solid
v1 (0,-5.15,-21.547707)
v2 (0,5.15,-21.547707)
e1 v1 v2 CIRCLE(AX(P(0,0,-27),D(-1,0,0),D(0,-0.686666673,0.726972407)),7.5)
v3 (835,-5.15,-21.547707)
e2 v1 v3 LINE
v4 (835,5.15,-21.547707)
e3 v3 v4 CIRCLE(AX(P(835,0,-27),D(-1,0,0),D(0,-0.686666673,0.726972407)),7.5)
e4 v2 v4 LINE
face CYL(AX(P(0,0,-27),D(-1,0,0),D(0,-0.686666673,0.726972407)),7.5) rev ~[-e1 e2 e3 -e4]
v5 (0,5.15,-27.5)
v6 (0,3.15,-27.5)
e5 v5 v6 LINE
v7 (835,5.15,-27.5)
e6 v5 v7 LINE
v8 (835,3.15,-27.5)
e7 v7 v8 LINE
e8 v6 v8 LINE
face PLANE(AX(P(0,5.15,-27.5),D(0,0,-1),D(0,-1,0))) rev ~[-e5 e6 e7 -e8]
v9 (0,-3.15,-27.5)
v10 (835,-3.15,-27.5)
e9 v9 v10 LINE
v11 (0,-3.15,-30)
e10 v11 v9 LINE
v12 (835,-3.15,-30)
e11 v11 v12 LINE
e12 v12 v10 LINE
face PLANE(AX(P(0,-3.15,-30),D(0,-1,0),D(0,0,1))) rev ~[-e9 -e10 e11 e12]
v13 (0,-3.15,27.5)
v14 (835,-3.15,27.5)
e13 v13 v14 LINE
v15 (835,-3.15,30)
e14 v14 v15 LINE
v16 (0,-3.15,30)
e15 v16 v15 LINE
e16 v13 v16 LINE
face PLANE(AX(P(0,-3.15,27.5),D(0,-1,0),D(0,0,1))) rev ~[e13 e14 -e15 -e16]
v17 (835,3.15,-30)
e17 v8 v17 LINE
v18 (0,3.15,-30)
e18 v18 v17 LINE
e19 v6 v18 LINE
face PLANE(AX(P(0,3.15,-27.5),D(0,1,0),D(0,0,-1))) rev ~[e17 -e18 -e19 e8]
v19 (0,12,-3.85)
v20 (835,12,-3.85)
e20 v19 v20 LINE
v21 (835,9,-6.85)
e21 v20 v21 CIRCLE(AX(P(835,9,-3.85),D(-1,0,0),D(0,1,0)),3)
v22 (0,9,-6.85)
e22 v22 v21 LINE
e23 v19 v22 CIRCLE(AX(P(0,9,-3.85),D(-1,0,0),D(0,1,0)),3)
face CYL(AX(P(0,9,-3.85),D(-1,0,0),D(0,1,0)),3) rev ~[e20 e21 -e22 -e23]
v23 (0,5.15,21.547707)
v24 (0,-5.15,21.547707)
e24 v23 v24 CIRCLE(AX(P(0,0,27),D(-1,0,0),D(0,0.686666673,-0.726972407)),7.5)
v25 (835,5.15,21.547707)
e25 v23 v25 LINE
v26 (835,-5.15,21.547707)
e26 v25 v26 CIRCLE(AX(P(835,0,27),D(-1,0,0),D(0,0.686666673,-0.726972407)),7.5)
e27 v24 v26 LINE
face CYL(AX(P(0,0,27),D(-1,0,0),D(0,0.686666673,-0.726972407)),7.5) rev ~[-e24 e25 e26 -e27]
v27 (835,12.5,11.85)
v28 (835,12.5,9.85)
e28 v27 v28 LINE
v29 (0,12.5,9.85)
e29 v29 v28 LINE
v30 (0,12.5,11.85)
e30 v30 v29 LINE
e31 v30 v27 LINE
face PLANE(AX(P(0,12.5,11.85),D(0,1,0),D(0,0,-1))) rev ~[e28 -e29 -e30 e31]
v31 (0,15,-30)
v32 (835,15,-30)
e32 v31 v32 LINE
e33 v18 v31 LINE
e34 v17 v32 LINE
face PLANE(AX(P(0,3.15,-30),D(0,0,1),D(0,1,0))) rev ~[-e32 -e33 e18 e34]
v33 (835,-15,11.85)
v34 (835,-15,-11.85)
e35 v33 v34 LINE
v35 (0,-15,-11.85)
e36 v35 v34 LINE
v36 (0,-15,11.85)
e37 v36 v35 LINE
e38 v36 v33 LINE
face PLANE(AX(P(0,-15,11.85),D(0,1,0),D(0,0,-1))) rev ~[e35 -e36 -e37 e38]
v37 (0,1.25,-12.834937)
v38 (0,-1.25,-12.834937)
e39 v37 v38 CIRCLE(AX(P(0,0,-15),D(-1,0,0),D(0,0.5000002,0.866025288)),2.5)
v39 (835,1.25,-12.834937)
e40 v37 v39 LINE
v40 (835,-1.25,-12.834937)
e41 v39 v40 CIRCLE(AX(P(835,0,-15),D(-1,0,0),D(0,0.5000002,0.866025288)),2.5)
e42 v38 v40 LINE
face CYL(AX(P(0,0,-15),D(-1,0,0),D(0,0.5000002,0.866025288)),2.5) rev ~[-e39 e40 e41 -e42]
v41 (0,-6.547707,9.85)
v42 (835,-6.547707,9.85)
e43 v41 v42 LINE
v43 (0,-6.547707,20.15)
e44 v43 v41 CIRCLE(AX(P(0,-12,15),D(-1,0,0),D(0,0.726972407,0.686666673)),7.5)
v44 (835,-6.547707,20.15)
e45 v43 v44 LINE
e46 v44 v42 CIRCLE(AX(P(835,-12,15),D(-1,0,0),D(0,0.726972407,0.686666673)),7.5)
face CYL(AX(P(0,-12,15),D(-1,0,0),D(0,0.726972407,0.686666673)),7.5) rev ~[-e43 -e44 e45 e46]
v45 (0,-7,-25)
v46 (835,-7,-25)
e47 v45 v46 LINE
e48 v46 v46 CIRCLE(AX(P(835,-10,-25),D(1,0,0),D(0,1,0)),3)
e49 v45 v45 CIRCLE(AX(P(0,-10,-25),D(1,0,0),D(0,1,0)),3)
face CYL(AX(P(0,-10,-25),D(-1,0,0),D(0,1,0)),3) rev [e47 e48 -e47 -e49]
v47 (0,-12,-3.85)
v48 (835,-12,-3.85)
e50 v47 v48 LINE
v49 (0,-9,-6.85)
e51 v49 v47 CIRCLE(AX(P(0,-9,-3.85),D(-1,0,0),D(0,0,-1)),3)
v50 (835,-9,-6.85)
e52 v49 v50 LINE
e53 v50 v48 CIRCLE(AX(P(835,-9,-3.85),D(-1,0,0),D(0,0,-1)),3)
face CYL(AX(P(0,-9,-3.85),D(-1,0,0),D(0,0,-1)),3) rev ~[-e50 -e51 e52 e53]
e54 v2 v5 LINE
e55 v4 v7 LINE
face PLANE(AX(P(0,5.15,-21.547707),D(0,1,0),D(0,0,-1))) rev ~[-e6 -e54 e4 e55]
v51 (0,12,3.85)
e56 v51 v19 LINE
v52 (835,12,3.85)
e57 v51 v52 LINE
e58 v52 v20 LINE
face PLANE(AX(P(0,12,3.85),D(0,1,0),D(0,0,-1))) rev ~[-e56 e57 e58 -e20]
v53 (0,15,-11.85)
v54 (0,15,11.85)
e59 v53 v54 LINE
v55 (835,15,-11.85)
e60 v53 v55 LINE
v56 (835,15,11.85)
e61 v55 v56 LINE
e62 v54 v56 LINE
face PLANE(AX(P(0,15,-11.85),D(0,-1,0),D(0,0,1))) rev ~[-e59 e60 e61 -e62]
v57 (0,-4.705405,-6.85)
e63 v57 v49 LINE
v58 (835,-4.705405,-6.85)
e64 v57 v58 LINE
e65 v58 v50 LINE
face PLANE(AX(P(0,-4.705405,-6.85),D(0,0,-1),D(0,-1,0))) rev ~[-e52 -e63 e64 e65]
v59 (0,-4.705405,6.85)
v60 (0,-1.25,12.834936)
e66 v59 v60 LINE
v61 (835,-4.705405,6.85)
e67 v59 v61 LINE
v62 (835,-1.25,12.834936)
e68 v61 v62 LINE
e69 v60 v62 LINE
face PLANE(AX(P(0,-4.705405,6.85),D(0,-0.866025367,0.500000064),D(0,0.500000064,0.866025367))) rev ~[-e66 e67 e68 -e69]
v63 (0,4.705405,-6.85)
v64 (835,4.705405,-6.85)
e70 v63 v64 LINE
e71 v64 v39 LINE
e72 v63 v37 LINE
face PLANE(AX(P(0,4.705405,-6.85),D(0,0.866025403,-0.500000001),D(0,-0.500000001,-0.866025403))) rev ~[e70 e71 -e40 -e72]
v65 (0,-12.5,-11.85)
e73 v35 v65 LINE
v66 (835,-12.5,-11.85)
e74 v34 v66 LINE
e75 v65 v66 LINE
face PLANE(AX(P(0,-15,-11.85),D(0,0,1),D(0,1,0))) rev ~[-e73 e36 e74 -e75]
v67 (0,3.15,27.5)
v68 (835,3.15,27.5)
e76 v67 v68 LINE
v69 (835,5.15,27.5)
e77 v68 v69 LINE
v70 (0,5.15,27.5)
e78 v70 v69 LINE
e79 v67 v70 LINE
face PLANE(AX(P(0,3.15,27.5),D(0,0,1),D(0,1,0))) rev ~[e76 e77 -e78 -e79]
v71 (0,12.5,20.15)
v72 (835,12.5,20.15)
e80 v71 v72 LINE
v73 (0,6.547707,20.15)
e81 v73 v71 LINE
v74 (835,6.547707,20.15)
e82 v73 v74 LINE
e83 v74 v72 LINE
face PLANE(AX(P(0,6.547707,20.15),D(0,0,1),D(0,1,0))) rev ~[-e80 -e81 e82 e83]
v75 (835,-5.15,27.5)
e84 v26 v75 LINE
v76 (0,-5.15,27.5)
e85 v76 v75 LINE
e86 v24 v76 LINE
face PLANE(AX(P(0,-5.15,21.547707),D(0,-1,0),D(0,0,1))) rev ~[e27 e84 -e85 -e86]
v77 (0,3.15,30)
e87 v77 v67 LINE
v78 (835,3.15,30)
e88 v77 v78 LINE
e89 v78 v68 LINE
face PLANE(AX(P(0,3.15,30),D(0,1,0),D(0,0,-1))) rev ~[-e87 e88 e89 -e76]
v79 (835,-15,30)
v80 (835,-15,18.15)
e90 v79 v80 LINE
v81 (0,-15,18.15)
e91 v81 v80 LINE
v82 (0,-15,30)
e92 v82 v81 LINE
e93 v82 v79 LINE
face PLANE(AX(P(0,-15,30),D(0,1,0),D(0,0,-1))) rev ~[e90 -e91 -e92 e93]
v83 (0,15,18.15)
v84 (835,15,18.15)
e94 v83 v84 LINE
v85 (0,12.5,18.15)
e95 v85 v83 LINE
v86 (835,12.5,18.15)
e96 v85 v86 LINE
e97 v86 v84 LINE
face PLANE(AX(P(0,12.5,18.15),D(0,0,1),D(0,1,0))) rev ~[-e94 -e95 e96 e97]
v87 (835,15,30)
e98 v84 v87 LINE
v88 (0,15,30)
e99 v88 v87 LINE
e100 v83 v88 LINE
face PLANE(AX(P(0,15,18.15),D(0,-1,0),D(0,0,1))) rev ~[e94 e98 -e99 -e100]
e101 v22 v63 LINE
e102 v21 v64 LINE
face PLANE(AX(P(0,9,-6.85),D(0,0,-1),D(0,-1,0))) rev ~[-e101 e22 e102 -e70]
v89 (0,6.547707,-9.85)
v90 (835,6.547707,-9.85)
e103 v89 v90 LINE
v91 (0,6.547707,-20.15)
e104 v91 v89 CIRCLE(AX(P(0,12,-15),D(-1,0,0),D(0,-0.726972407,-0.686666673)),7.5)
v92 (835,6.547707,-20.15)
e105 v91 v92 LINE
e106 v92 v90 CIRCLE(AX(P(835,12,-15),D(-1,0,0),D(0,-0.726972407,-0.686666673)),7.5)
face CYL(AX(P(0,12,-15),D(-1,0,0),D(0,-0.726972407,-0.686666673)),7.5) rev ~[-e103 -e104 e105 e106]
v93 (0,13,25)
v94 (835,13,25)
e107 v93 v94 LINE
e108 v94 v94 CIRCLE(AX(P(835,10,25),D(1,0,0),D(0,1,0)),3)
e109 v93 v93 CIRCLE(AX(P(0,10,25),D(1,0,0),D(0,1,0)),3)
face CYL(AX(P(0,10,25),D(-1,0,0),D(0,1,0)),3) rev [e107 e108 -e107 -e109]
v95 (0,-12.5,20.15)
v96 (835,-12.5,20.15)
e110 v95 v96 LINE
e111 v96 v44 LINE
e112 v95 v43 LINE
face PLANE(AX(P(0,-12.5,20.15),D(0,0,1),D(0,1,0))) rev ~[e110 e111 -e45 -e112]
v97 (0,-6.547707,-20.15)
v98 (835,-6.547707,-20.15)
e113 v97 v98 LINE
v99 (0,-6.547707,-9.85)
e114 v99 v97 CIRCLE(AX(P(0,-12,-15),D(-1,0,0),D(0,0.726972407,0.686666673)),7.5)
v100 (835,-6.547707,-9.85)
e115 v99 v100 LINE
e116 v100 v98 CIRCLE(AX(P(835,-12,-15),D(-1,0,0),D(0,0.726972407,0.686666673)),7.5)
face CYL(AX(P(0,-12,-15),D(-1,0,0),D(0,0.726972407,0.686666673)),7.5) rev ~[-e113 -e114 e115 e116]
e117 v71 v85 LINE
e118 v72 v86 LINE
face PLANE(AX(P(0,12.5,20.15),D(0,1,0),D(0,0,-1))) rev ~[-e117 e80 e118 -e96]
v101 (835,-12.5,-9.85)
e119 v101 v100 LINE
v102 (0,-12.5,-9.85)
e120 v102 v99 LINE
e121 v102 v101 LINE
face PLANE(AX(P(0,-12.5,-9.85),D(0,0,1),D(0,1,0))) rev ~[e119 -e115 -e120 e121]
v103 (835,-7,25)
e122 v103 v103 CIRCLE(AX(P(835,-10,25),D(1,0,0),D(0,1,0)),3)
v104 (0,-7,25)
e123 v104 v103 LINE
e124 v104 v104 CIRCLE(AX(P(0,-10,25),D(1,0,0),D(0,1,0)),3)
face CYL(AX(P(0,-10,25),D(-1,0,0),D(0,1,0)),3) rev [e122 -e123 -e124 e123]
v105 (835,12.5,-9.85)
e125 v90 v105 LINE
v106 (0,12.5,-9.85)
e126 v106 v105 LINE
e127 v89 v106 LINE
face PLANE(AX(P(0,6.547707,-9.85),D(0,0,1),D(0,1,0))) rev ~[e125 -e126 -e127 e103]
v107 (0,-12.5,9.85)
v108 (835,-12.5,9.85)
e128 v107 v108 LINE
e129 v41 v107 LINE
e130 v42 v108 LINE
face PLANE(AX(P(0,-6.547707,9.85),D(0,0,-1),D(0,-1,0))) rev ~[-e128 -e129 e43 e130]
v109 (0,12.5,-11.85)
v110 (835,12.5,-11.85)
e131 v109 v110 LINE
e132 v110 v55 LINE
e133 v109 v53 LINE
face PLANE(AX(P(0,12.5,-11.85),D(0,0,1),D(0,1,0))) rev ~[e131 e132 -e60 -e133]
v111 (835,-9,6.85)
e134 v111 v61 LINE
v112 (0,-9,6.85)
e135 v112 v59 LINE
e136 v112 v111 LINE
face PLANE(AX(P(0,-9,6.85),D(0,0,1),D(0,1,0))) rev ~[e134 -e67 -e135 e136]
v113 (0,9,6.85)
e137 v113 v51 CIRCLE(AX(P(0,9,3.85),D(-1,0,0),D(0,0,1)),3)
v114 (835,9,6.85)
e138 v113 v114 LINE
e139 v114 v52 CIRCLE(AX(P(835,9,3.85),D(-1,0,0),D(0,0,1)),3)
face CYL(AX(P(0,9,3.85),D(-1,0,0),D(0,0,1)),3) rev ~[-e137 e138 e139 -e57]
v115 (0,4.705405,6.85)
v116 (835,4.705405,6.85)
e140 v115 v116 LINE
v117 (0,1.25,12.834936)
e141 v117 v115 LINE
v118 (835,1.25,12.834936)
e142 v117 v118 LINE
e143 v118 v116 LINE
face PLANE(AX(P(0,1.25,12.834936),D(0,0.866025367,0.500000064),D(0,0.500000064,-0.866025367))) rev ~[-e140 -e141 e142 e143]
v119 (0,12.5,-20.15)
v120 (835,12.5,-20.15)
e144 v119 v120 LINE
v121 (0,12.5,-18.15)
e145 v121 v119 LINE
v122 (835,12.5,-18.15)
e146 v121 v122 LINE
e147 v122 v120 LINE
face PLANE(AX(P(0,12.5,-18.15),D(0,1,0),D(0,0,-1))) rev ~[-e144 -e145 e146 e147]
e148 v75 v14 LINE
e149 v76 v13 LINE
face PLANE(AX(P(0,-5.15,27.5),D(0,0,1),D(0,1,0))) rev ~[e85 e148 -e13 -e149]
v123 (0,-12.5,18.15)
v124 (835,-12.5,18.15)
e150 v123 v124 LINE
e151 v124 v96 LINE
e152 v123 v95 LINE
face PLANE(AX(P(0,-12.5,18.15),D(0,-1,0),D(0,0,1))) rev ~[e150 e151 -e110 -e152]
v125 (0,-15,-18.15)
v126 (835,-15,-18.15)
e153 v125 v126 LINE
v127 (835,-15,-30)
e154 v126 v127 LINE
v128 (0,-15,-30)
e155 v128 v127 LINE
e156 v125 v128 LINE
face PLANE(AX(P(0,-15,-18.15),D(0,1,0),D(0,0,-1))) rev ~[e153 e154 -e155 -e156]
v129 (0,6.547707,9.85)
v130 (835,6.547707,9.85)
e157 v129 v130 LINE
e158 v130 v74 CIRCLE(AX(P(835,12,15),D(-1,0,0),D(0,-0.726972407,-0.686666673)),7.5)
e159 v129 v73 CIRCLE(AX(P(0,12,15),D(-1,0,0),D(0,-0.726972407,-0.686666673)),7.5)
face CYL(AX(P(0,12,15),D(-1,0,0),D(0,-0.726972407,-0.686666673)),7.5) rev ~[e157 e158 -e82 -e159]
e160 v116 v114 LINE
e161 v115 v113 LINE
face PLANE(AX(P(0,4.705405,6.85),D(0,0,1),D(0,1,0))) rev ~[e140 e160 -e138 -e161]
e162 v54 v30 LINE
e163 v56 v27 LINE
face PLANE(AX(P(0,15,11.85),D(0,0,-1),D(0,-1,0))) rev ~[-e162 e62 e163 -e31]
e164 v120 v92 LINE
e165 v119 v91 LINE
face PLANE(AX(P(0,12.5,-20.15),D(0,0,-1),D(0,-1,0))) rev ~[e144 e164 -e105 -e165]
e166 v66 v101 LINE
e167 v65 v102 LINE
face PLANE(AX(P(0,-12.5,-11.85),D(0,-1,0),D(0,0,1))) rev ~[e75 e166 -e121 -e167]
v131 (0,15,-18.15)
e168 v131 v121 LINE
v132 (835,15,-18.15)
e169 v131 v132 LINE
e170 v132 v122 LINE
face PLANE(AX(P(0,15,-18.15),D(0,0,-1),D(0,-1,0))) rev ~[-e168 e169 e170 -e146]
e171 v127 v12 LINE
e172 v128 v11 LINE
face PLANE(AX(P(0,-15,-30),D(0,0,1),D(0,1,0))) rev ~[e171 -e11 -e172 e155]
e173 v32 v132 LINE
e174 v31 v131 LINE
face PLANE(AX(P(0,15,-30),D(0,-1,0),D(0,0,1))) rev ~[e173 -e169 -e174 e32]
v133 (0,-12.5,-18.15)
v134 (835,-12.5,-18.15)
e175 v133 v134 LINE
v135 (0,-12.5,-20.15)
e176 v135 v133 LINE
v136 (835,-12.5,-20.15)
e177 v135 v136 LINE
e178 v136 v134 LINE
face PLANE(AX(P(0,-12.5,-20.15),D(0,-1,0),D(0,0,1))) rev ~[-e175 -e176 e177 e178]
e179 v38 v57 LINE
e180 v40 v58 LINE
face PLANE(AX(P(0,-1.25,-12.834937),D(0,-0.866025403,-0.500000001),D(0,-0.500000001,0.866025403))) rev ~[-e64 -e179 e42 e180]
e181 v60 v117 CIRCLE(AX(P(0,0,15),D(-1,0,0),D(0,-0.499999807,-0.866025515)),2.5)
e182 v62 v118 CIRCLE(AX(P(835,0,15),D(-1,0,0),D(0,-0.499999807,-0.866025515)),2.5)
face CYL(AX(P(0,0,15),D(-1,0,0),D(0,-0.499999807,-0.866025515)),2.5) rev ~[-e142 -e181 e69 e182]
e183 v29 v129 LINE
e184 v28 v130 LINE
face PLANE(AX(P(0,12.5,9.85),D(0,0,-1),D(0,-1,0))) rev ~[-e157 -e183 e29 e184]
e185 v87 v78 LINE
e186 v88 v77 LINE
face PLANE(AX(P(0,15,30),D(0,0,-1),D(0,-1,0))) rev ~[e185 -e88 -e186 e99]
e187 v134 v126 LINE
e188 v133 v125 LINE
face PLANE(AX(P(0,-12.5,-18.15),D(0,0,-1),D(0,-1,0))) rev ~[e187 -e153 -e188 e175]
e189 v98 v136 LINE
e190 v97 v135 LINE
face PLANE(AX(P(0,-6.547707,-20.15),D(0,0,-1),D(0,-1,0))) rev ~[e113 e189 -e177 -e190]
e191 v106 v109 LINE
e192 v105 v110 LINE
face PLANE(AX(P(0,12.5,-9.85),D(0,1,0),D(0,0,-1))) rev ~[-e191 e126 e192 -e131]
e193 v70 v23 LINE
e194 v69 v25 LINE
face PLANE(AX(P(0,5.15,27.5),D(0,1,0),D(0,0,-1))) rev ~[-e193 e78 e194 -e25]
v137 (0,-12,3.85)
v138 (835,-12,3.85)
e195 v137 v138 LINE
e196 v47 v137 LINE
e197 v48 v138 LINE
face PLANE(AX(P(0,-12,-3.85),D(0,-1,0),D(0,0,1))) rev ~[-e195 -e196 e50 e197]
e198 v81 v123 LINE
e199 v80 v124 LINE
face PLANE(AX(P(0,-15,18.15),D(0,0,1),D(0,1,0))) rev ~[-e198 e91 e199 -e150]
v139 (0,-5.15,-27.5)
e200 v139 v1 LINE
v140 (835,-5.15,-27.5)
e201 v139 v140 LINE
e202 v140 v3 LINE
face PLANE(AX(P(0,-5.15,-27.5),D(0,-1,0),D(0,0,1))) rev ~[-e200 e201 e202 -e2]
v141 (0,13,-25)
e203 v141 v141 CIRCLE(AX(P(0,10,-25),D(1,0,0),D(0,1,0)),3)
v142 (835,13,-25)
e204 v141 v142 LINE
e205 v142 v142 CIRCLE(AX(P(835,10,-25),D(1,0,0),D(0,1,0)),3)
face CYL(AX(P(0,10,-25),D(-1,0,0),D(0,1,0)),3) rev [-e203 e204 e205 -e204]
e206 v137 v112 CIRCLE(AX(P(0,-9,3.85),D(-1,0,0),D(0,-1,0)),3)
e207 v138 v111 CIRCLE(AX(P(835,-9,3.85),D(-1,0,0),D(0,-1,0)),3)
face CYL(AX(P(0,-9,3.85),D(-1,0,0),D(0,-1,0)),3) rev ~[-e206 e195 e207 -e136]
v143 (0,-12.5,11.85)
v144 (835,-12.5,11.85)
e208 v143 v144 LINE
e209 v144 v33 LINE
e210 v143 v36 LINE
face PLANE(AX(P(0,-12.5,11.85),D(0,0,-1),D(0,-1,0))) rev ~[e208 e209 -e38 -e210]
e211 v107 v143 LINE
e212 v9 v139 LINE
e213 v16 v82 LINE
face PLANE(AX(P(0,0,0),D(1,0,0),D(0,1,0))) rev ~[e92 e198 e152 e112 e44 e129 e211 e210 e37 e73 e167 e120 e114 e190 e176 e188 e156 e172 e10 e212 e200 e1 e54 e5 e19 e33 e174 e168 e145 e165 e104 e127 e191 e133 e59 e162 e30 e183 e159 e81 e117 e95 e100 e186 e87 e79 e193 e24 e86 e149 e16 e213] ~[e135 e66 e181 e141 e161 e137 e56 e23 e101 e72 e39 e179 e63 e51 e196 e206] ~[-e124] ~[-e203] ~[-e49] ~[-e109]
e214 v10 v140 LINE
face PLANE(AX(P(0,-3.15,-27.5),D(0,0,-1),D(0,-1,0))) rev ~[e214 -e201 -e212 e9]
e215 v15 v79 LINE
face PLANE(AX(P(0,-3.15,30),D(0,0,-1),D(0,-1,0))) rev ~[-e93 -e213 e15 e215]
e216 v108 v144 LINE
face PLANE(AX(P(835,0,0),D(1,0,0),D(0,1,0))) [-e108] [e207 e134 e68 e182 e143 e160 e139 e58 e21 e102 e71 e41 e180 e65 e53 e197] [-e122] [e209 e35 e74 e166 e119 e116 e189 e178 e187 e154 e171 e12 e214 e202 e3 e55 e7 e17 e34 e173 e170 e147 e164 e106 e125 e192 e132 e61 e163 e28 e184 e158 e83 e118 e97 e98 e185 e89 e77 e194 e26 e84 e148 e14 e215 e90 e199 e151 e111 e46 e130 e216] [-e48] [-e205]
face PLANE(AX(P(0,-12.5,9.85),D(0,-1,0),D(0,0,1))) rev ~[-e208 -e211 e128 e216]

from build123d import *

# Parameters (mm, degrees)
F0_R     = 3
F1_DEPTH = 835


# Not quite as in the source:
# - ends of sketch curves that miss each other by under 0.0002 mm in the source are joined


with BuildPart() as f1:
    # F0 (on Right) → F1 (new body)
    with BuildSketch(Plane.YZ):
        with BuildLine():
            Line((12.5, -11.85), (15, -11.85))
            Line((15, -11.85), (15, 11.85))
            Line((15, 11.85), (12.5, 11.85))
            Line((12.5, 11.85), (12.5, 9.85))
            Line((12.5, 9.85), (6.547707, 9.85))
            ThreePointArc((6.5477069495, 9.8499999523), (4.5, 15), (6.5477069495, 20.1500000477))
            Line((6.547707, 20.15), (12.5, 20.15))
            Line((12.5, 20.15), (12.5, 18.15))
            Line((12.5, 18.15), (15, 18.15))
            Line((15, 18.15), (15, 30))
            Line((15, 30), (3.15, 30))
            Line((3.15, 30), (3.15, 27.5))
            Line((3.15, 27.5), (5.15, 27.5))
            Line((5.15, 27.5), (5.15, 21.547707))
            ThreePointArc((5.1500000477, 21.5477069495), (0, 19.5), (-5.1500000477, 21.5477069495))
            Line((-5.15, 21.547707), (-5.15, 27.5))
            Line((-5.15, 27.5), (-3.15, 27.5))
            Line((-3.15, 27.5), (-3.15, 30))
            Line((-3.15, 30), (-15, 30))
            Line((-15, 30), (-15, 18.15))
            Line((-15, 18.15), (-12.5, 18.15))
            Line((-12.5, 18.15), (-12.5, 20.15))
            Line((-12.5, 20.15), (-6.547707, 20.15))
            ThreePointArc((-6.5477069495, 20.1500000477), (-4.5, 15), (-6.5477069495, 9.8499999523))
            Line((-6.547707, 9.85), (-12.5, 9.85))
            Line((-12.5, 9.85), (-12.5, 11.85))
            Line((-12.5, 11.85), (-15, 11.85))
            Line((-15, 11.85), (-15, -11.85))
            Line((-15, -11.85), (-12.5, -11.85))
            Line((-12.5, -11.85), (-12.5, -9.85))
            Line((-12.5, -9.85), (-6.547707, -9.85))
            ThreePointArc((-6.5477069495, -9.8499999523), (-4.5, -15), (-6.5477069495, -20.1500000477))
            Line((-6.547707, -20.15), (-12.5, -20.15))
            Line((-12.5, -20.15), (-12.5, -18.15))
            Line((-12.5, -18.15), (-15, -18.15))
            Line((-15, -18.15), (-15, -30))
            Line((-15, -30), (-3.15, -30))
            Line((-3.15, -30), (-3.15, -27.5))
            Line((-3.15, -27.5), (-5.15, -27.5))
            Line((-5.15, -27.5), (-5.15, -21.547707))
            ThreePointArc((-5.1500000477, -21.5477069495), (0, -19.5), (5.1500000477, -21.5477069495))
            Line((5.15, -21.547707), (5.15, -27.5))
            Line((5.15, -27.5), (3.15, -27.5))
            Line((3.15, -27.5), (3.15, -30))
            Line((3.15, -30), (15, -30))
            Line((15, -30), (15, -18.15))
            Line((15, -18.15), (12.5, -18.15))
            Line((12.5, -18.15), (12.5, -20.15))
            Line((12.5, -20.15), (6.547707, -20.15))
            ThreePointArc((6.5477069495, -20.1500000477), (4.5, -15), (6.5477069495, -9.8499999523))
            Line((6.547707, -9.85), (12.5, -9.85))
            Line((12.5, -9.85), (12.5, -11.85))
        make_face()
        with Locations((-10, -25)):
            Circle(F0_R, mode=Mode.SUBTRACT)
        with Locations((10, -25)):
            Circle(F0_R, mode=Mode.SUBTRACT)
        with Locations((-10, 25)):
            Circle(F0_R, mode=Mode.SUBTRACT)
        with BuildLine():
            ThreePointArc((-12, 3.85), (-11.1213203436, 5.9713203436), (-9, 6.85))
            Line((-9, 6.85), (-4.705405, 6.85))
            Line((-4.705405, 6.85), (-1.25, 12.834936))
            ThreePointArc((-1.25, 12.834936), (0, 17.5), (1.2499997876, 12.8349363679))
            Line((1.2499997876, 12.8349363679), (4.705405, 6.85))
            Line((4.705405, 6.85), (9, 6.85))
            ThreePointArc((9, 6.85), (11.1213203436, 5.9713203436), (12, 3.85))
            Line((12, 3.85), (12, -3.85))
            ThreePointArc((12, -3.85), (11.1213203436, -5.9713203436), (9, -6.85))
            Line((9, -6.85), (4.705405, -6.85))
            Line((4.705405, -6.85), (1.25, -12.834937))
            ThreePointArc((1.25, -12.834937), (0, -17.5), (-1.2500002206, -12.8349366179))
            Line((-1.2500002206, -12.8349366179), (-4.705405, -6.85))
            Line((-4.705405, -6.85), (-9, -6.85))
            ThreePointArc((-9, -6.85), (-11.1213203436, -5.9713203436), (-12, -3.85))
            Line((-12, -3.85), (-12, 3.85))
        make_face(mode=Mode.SUBTRACT)
        with Locations((10, 25)):
            Circle(F0_R, mode=Mode.SUBTRACT)
    extrude(amount=F1_DEPTH)


solid = f1.part
